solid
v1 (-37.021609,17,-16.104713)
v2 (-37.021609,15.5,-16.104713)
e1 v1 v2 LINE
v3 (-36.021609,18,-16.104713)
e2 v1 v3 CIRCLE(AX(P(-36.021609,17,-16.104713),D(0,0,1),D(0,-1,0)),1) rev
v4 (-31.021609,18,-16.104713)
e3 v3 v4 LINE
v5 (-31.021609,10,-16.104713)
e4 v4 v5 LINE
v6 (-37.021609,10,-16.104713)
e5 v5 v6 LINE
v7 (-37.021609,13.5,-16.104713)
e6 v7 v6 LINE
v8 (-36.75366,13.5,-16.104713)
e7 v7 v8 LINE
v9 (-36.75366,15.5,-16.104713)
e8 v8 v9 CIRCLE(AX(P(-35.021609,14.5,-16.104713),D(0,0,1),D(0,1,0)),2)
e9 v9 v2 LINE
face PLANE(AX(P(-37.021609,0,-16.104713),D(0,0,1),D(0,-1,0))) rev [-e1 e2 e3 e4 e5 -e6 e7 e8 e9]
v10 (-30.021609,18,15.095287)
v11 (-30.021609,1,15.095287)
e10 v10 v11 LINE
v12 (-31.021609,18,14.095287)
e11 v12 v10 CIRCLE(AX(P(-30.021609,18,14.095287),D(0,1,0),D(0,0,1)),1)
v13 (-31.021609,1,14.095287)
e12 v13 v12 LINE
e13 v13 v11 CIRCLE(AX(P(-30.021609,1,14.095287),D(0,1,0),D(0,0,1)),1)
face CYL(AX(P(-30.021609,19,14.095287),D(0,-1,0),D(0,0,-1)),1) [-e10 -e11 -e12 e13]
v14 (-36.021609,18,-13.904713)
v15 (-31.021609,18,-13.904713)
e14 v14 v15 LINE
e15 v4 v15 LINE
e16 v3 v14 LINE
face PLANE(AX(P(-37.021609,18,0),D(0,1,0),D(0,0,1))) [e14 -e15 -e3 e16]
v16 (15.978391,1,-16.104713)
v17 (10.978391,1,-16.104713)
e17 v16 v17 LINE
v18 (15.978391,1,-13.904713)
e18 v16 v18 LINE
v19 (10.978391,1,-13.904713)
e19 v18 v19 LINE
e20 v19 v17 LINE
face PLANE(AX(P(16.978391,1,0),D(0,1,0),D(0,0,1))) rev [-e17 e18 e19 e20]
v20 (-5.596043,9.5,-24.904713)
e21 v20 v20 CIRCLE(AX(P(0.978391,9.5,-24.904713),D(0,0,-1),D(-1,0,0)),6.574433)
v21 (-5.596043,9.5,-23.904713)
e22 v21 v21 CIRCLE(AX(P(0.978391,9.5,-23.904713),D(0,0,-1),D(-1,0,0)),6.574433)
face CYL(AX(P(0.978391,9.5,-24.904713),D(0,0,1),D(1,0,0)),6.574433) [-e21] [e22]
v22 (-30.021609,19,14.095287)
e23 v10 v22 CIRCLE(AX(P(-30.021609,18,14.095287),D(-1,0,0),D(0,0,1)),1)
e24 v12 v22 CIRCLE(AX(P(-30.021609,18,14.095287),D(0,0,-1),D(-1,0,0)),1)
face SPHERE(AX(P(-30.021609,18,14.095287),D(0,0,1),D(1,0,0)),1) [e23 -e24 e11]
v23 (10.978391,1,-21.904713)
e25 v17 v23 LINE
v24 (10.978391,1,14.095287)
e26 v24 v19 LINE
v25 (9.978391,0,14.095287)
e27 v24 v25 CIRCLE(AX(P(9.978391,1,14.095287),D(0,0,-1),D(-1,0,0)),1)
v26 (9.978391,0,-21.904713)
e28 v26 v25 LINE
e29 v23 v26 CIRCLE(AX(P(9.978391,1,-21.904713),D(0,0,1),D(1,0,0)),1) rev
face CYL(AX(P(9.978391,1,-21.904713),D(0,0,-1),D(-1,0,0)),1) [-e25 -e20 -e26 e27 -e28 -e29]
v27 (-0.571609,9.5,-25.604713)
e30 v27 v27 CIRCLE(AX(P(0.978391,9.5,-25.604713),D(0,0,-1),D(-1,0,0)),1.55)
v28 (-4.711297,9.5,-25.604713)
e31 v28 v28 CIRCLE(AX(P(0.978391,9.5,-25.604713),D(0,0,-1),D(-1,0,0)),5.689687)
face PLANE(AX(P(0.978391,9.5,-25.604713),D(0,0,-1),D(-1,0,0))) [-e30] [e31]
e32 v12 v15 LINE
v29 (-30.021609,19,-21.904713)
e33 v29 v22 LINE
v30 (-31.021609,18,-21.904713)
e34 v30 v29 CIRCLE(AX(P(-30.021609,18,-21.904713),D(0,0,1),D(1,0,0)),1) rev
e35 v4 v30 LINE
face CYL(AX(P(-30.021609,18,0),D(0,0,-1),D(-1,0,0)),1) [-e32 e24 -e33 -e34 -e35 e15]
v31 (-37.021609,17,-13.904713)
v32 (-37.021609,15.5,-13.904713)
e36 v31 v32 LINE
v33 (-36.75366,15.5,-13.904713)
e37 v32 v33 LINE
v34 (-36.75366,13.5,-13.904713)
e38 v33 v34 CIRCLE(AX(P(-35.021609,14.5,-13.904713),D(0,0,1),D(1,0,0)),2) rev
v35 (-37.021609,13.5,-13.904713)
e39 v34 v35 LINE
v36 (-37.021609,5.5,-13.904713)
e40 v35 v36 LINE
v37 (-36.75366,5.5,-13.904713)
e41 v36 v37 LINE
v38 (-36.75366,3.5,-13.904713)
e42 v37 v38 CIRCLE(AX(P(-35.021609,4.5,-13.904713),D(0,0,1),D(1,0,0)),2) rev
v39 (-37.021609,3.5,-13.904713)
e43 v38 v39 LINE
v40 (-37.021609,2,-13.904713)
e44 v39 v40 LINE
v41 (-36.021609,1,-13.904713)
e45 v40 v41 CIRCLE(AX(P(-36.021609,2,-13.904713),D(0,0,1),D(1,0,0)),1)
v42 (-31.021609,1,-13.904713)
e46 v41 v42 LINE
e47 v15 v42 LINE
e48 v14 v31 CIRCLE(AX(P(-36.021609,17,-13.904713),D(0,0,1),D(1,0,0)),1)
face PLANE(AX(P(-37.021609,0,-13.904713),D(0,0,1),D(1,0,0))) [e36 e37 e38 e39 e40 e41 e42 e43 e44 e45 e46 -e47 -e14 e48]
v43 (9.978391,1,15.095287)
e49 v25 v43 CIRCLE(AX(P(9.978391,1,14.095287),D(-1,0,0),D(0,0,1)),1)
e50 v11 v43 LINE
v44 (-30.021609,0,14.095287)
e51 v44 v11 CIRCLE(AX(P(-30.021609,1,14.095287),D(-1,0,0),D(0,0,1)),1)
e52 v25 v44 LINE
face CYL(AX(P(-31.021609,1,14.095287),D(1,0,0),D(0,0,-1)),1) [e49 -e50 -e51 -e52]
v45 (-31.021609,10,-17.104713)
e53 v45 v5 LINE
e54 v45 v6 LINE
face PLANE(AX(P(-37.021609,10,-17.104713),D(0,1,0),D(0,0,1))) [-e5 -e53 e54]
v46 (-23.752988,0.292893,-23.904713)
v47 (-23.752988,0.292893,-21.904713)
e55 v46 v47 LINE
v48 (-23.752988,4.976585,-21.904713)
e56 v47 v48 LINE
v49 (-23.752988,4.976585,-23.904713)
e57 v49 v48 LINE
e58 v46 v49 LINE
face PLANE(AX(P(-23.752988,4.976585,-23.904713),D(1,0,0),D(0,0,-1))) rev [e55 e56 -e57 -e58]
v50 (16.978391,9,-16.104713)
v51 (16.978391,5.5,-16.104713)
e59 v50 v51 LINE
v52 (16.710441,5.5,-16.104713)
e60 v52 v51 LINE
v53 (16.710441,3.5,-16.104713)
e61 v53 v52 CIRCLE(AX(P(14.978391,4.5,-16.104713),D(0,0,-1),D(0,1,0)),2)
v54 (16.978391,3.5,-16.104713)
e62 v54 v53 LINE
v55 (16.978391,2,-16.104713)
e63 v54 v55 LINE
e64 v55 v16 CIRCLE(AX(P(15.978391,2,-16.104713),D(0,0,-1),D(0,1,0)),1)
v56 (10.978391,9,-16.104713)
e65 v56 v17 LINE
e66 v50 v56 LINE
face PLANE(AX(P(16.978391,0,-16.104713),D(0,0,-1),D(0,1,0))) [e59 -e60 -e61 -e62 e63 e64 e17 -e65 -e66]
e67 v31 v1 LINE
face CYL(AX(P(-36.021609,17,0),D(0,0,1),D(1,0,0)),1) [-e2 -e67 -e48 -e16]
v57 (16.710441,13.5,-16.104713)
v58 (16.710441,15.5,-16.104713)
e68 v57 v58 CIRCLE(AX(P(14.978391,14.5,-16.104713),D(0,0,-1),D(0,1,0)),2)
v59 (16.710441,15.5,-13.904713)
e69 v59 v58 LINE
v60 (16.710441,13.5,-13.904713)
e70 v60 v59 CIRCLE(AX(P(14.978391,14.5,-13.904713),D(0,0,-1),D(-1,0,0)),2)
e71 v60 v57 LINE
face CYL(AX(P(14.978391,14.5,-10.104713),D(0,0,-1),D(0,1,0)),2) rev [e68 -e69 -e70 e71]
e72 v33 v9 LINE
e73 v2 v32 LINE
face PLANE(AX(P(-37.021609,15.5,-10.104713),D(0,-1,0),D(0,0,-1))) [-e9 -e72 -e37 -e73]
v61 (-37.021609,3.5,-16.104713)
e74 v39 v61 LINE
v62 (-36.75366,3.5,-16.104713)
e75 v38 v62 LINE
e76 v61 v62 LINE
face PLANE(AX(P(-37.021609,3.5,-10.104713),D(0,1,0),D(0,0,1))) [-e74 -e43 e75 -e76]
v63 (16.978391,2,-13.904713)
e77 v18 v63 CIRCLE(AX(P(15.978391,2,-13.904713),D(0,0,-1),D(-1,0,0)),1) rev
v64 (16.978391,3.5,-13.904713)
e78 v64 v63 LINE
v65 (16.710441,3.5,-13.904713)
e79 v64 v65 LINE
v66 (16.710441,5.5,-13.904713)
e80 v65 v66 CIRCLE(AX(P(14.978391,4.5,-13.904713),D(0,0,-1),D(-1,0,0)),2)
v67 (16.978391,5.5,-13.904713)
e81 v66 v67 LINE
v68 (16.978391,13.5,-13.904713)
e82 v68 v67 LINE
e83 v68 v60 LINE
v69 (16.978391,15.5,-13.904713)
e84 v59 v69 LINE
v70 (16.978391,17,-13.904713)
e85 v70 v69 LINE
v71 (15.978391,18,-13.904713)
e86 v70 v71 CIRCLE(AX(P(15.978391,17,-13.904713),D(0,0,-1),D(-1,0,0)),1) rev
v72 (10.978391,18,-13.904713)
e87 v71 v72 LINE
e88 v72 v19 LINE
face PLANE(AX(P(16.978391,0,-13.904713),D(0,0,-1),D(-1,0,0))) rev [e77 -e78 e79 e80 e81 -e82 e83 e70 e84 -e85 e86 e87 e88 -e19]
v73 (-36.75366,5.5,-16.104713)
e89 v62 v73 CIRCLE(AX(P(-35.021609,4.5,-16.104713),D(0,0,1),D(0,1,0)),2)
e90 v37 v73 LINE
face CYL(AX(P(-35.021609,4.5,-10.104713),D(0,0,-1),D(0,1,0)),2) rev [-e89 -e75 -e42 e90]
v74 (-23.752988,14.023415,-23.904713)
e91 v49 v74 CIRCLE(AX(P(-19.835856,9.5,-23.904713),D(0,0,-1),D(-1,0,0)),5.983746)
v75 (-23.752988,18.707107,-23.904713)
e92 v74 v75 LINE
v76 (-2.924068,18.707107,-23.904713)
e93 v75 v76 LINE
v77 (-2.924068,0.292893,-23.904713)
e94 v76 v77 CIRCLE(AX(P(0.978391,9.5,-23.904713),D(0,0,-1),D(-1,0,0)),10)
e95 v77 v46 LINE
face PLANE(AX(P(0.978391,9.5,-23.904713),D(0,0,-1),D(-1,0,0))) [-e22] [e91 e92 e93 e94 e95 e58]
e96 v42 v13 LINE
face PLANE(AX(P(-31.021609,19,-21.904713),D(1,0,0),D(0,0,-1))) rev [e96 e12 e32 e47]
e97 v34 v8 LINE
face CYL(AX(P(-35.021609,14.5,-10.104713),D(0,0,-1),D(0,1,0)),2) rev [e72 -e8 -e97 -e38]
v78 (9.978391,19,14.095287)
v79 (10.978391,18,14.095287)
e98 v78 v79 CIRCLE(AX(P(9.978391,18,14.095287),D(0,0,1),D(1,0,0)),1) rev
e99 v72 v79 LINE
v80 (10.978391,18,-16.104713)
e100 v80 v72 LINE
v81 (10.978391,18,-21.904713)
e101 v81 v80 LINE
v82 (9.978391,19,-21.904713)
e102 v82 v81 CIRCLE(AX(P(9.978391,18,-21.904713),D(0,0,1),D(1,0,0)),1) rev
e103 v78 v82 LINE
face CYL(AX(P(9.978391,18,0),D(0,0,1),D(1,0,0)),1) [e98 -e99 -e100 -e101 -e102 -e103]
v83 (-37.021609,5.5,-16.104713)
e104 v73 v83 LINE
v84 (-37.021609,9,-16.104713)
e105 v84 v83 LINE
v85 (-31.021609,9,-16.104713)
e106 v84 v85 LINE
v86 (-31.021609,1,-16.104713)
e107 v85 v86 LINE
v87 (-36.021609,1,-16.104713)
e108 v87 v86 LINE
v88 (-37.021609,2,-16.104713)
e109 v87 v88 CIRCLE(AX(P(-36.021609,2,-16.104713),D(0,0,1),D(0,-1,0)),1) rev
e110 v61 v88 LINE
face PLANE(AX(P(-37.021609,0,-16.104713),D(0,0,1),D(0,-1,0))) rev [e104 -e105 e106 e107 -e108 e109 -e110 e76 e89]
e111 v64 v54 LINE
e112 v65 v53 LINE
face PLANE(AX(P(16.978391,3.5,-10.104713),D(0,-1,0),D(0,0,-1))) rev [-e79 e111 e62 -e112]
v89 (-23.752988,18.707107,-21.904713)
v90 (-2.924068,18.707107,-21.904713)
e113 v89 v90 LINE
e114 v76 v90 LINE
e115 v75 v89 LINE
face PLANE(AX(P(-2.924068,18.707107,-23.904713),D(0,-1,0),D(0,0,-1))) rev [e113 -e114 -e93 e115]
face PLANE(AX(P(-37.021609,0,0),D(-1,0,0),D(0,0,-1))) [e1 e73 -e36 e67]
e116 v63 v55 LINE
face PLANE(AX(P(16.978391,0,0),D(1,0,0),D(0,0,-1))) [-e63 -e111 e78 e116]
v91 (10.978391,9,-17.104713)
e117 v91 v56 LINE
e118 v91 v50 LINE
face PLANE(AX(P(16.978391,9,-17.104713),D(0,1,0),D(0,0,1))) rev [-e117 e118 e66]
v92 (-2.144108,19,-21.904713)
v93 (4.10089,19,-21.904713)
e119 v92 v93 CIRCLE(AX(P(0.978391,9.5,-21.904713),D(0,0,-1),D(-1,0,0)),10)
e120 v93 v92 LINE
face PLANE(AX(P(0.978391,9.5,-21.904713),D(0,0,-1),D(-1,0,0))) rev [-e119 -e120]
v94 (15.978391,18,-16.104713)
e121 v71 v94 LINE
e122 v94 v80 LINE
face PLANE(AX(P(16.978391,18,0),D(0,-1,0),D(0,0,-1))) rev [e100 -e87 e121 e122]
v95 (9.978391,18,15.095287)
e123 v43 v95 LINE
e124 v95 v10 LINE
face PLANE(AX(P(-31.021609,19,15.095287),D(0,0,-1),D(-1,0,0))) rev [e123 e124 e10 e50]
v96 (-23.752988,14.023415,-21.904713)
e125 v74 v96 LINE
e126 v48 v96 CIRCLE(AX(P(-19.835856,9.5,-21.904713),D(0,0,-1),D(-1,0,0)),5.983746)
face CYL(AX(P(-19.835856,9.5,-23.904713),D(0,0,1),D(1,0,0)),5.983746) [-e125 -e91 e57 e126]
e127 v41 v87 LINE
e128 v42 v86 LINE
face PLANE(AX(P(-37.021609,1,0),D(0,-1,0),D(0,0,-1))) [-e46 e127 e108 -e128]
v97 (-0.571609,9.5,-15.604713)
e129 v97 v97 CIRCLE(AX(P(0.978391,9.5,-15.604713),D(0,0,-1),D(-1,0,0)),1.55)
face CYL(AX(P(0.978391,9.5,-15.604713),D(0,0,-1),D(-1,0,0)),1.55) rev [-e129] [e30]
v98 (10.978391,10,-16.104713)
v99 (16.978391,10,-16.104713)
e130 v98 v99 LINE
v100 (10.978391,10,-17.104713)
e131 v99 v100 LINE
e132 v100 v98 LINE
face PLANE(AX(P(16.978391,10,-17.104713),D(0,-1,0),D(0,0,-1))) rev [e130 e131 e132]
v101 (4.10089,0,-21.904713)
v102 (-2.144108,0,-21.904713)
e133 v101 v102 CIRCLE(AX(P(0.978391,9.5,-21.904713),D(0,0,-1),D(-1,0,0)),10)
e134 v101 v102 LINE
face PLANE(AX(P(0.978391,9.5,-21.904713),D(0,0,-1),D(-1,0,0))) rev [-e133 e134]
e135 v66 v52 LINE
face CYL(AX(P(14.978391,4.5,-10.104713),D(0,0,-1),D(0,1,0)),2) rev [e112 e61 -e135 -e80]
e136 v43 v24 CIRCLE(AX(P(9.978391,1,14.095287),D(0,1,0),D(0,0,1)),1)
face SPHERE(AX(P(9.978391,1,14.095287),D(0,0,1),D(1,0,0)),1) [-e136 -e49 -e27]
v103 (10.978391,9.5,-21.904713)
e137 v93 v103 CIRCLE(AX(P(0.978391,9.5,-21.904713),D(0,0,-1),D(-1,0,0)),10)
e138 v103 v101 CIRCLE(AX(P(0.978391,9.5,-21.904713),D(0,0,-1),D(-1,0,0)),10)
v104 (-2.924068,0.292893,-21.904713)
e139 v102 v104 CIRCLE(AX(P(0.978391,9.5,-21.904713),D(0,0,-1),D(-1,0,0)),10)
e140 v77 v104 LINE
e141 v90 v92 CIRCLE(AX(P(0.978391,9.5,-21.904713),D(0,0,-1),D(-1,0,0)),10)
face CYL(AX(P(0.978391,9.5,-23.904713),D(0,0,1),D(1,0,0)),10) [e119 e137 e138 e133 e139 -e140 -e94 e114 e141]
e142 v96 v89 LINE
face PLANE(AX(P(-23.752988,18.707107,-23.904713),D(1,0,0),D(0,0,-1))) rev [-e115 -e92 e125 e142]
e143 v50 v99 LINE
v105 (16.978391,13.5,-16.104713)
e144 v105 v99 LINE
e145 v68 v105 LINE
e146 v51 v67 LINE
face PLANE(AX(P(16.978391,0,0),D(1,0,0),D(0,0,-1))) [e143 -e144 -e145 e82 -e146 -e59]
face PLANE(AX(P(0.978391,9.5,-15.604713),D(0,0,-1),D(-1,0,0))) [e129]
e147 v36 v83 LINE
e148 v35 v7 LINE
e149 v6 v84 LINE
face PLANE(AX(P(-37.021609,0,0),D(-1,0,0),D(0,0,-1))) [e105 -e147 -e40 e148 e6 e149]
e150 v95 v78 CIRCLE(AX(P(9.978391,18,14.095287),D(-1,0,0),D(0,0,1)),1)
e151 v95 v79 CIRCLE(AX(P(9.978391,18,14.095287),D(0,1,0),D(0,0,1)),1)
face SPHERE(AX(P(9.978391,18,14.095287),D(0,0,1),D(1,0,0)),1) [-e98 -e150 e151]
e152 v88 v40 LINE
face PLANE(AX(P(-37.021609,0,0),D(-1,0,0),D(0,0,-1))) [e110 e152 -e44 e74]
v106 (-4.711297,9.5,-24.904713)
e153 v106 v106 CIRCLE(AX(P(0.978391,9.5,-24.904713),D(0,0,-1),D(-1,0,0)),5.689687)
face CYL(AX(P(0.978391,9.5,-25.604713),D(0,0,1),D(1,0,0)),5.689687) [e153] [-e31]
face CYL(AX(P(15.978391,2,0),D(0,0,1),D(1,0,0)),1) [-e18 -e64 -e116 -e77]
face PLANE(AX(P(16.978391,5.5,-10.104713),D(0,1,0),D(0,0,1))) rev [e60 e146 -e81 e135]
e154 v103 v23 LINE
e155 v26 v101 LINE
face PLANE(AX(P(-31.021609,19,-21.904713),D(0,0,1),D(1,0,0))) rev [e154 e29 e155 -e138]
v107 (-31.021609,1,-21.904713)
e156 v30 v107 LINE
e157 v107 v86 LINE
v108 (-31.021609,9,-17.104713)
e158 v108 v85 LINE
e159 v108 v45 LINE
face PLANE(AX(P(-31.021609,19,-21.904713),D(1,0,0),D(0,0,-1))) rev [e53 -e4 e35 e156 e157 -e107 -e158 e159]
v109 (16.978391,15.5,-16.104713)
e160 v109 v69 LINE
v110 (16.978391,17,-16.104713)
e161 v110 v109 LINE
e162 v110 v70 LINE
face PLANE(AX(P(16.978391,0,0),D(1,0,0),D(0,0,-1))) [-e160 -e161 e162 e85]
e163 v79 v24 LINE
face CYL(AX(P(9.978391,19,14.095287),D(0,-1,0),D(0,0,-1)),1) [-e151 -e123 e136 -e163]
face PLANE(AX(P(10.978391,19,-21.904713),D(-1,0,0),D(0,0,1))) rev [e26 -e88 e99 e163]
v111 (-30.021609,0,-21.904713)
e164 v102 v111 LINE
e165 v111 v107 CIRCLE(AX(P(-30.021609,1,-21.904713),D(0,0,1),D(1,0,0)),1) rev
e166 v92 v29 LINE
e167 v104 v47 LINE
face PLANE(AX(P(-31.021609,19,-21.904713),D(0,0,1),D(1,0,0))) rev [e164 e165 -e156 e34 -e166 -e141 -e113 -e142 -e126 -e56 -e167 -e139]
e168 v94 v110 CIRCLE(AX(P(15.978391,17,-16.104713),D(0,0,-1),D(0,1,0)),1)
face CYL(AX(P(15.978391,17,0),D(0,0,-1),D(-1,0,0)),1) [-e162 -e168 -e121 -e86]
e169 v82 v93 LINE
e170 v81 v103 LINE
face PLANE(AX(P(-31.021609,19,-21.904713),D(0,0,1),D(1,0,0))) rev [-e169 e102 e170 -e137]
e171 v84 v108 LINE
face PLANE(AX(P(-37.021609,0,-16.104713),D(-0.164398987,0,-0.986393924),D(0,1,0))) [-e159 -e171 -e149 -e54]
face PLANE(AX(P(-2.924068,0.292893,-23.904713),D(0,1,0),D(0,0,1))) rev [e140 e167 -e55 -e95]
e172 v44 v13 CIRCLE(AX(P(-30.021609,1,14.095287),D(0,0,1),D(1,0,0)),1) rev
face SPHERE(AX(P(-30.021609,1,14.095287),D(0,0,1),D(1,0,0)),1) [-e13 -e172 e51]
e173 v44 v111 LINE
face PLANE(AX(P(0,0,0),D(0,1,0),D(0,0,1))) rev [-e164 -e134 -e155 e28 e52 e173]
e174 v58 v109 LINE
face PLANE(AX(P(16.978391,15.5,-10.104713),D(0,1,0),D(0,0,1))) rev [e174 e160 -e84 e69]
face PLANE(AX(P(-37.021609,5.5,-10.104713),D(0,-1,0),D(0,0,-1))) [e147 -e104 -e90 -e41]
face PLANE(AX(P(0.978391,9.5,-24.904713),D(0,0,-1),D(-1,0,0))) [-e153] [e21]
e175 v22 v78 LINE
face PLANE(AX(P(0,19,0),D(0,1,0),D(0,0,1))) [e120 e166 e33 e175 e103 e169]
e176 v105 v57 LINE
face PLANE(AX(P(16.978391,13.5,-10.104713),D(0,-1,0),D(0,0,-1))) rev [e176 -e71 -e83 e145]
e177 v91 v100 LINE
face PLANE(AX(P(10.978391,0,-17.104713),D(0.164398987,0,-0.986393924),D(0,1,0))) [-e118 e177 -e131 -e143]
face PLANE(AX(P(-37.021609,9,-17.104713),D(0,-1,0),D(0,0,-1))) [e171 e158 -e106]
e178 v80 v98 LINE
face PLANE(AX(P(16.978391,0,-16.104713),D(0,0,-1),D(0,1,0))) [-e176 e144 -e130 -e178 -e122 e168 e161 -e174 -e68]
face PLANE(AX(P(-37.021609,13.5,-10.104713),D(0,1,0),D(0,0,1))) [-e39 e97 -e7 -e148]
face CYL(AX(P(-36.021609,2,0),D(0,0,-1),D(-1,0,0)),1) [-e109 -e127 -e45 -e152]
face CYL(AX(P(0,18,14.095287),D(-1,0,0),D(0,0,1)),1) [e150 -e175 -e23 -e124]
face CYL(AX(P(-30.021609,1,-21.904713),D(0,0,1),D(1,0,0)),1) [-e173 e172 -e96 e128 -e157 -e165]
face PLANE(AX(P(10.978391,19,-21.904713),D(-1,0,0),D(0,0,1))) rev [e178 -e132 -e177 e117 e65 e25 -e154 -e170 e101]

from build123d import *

# Parameters (mm, degrees)
SKETCH2_W            = 42
SKETCH2_H            = 37
BOSS_EXTRUDE1_DEPTH  = 19
FILLET1_R            = 1
FILLET2_R            = 1
SKETCH3_W            = 2.2
SKETCH3_H            = 8.5
BOSS_EXTRUDE2_DEPTH  = 6
SKETCH4_W            = 6
SKETCH4_H            = 1
BOSS_EXTRUDE3_DEPTH  = 1
CHAMFER1_SIZE2       = 1
CHAMFER1_SIZE        = 6
FILLET3_R            = 1
CUT_EXTRUDE1_DEPTH   = 6
FILLET3_OF_MIRROR9_R = 1
CHAMFER2_SIZE        = 1
CHAMFER2_SIZE_2      = 6
FILLET4_R            = 1
BOSS_EXTRUDE4_DEPTH  = 2
SKETCH9_R            = 6.574433214
BOSS_EXTRUDE5_DEPTH  = 1
SKETCH10_R           = 5.689687475
BOSS_EXTRUDE6_DEPTH  = 0.7
SKETCH11_R           = 1.55
CUT_EXTRUDE2_DEPTH   = 10


# Some blends are built 0.0001 mm under size
with BuildPart() as part:
    # Sketch2 → Boss-Extrude1 (new body)
    with BuildSketch(Plane(origin=(0, 0, 0), x_dir=(1, 0, 0), z_dir=(0, 1, 0))):
        with Locations((-10.021609405, 3.404712932)):
            Rectangle(SKETCH2_W, SKETCH2_H)
    extrude(amount=BOSS_EXTRUDE1_DEPTH)

    # Fillet1
    fillet1_edges = [part.edges().sort_by_distance(p)[0] for p in [
        (10.978390595, 19, -3.404712932),
    ]]
    fillet(fillet1_edges, radius=FILLET1_R)

    # Fillet2
    fillet2_edges = [part.edges().sort_by_distance(p)[0] for p in [
        (-31.021609405, 19, -3.404712932),
        (10.978390595, 0, -3.404712932),
        (-31.021609405, 0, -3.404712932),
    ]]
    fillet(fillet2_edges, radius=FILLET2_R)

    # Sketch3 → Boss-Extrude2 (add)
    with BuildSketch(Plane(origin=(10.978390595, 0, 0), x_dir=(0, 0, -1), z_dir=(1, 0, 0))):
        with Locations((15.004712932, 5.25)):
            Rectangle(SKETCH3_W, SKETCH3_H)
        with Locations((15.004712932, 13.75)):
            Rectangle(SKETCH3_W, SKETCH3_H)
    boss_extrude2 = extrude(amount=BOSS_EXTRUDE2_DEPTH)

    # Sketch4 → Boss-Extrude3 (add)
    with BuildSketch(Plane(origin=(0, 0, -16.104712932), x_dir=(-1, 0, 0), z_dir=(0, 0, -1))):
        with Locations((-13.978390595, 9.5)):
            Rectangle(SKETCH4_W, SKETCH4_H)
    boss_extrude3 = extrude(amount=BOSS_EXTRUDE3_DEPTH)

    # Chamfer1
    chamfer1_edges = [part.edges().sort_by_distance(p)[0] for p in [
        (16.978390595, 9.5, -17.104712932),
    ]]
    chamfer1_side = [part.faces().sort_by_distance(p)[0] for p in [
        (16.958390595, 9.5, -17.104712932),
    ]]
    chamfer(chamfer1_edges, length=CHAMFER1_SIZE - 0.0001, length2=CHAMFER1_SIZE2 - 0.0001, reference=chamfer1_side[0])  # a hair under: the kernel refuses the full size

    # Fillet3
    fillet3_edges = [part.edges().sort_by_distance(p)[0] for p in [
        (16.978390595, 18, -15.004712932),
        (16.978390595, 1, -15.004712932),
    ]]
    fillet(fillet3_edges, radius=FILLET3_R)

    # Sketch5 → Cut-Extrude1 (cut)
    with BuildSketch(Plane(origin=(0, 0, -16.104712932), x_dir=(-1, 0, 0), z_dir=(0, 0, -1))):
        with BuildLine():
            Line((-16.978390595, 15.5), (-16.978390595, 13.5))
            Line((-16.978390595, 13.5), (-16.710441403, 13.5))
            ThreePointArc((-16.710441403, 13.5), (-12.978390595, 14.5), (-16.710441403, 15.5))
            Line((-16.710441403, 15.5), (-16.978390595, 15.5))
        make_face()
        with BuildLine():
            Line((-16.978390595, 3.5), (-16.978390595, 5.5))
            Line((-16.978390595, 5.5), (-16.710441403, 5.5))
            ThreePointArc((-16.710441403, 5.5), (-12.978390595, 4.5), (-16.710441403, 3.5))
            Line((-16.710441403, 3.5), (-16.978390595, 3.5))
        make_face()
    cut_extrude1 = extrude(amount=-CUT_EXTRUDE1_DEPTH, mode=Mode.SUBTRACT)

    # Mirror9: Boss-Extrude2, Boss-Extrude3, Cut-Extrude1 across plane
    add(boss_extrude2.mirror(Plane(origin=(-10.021609405, 0, 0), x_dir=(0, 0, 1), z_dir=(1, 0, 0))))
    add(boss_extrude3.mirror(Plane(origin=(-10.021609405, 0, 0), x_dir=(0, 0, 1), z_dir=(1, 0, 0))))
    add(cut_extrude1.mirror(Plane(origin=(-10.021609405, 0, 0), x_dir=(0, 0, 1), z_dir=(1, 0, 0))), mode=Mode.SUBTRACT)

    # Fillet3 of Mirror9
    fillet3_of_mirror9_edges = [part.edges().sort_by_distance(p)[0] for p in [
        (-37.021609405, 18, -15.004712932),
        (-37.021609405, 1, -15.004712932),
    ]]
    fillet(fillet3_of_mirror9_edges, radius=FILLET3_OF_MIRROR9_R)

    # Chamfer2
    # the kernel refuses this chamfer: 6, 1 mm, written as the material it takes off along each edge
    with BuildSketch(Plane(origin=(-37.021609405, 25.592148365, -17.104712932), x_dir=(-0.22206223681747272, 0, 0.9750324932942598), z_dir=(0, -1, 0))) as chamfer2_piece_1:
        Polygon((CHAMFER2_SIZE * 0.975032493294, -CHAMFER2_SIZE * 0.222062236817), (-CHAMFER2_SIZE_2 * 0.222062236817, -CHAMFER2_SIZE_2 * 0.975032493294), (0, 0), align=None)
    extrude(amount=32.18429673, mode=Mode.SUBTRACT)

    # Fillet4
    fillet4_edges = [part.edges().sort_by_distance(p)[0] for p in [
        (10.978390595, 9.5, 15.095287068),
        (10.685497376, 18.707106781, 15.095287068),
        (-10.021609405, 19, 15.095287068),
        (-31.021609405, 9.5, 15.095287068),
        (-10.021609405, 0, 15.095287068),
        (10.685497376, 0.292893219, 15.095287068),
        (-30.728716186, 0.292893219, 15.095287068),
        (-30.728716186, 18.707106781, 15.095287068),
    ]]
    fillet(fillet4_edges, radius=FILLET4_R)

    # Sketch8 → Boss-Extrude4 (add)
    with BuildSketch(Plane(origin=(0, 0, -21.904712932), x_dir=(-1, 0, 0), z_dir=(0, 0, -1))):
        with BuildLine():
            Line((2.924068209, 18.707106781), (23.752988448, 18.707106781))
            Line((23.752988448, 18.707106781), (23.752988448, 14.023415458))
            ThreePointArc((23.752988448, 14.023415458), (25.81960193, 9.5), (23.752988448, 4.976584542))
            Line((23.752988448, 4.976584542), (23.752988448, 0.292893219))
            Line((23.752988448, 0.292893219), (2.924068209, 0.292893219))
            ThreePointArc((2.924068209, 0.292893219), (-10.978390595, 9.5), (2.924068209, 18.707106781))
        make_face()
    extrude(amount=BOSS_EXTRUDE4_DEPTH)

    # Sketch9 → Boss-Extrude5 (add)
    with BuildSketch(Plane(origin=(0, 0, -23.904712932), x_dir=(-1, 0, 0), z_dir=(0, 0, -1))):
        with Locations((-0.978390595, 9.5)):
            Circle(SKETCH9_R)
    extrude(amount=BOSS_EXTRUDE5_DEPTH)

    # Sketch10 → Boss-Extrude6 (add)
    with BuildSketch(Plane(origin=(0, 0, -24.904712932), x_dir=(-1, 0, 0), z_dir=(0, 0, -1))):
        with Locations((-0.978390595, 9.5)):
            Circle(SKETCH10_R)
    extrude(amount=BOSS_EXTRUDE6_DEPTH)

    # Sketch11 → Cut-Extrude2 (cut)
    with BuildSketch(Plane(origin=(0, 0, -25.604712932), x_dir=(-1, 0, 0), z_dir=(0, 0, -1))):
        with Locations((-0.978390595, 9.5)):
            Circle(SKETCH11_R)
    extrude(amount=-CUT_EXTRUDE2_DEPTH, mode=Mode.SUBTRACT)


solid = part.part
